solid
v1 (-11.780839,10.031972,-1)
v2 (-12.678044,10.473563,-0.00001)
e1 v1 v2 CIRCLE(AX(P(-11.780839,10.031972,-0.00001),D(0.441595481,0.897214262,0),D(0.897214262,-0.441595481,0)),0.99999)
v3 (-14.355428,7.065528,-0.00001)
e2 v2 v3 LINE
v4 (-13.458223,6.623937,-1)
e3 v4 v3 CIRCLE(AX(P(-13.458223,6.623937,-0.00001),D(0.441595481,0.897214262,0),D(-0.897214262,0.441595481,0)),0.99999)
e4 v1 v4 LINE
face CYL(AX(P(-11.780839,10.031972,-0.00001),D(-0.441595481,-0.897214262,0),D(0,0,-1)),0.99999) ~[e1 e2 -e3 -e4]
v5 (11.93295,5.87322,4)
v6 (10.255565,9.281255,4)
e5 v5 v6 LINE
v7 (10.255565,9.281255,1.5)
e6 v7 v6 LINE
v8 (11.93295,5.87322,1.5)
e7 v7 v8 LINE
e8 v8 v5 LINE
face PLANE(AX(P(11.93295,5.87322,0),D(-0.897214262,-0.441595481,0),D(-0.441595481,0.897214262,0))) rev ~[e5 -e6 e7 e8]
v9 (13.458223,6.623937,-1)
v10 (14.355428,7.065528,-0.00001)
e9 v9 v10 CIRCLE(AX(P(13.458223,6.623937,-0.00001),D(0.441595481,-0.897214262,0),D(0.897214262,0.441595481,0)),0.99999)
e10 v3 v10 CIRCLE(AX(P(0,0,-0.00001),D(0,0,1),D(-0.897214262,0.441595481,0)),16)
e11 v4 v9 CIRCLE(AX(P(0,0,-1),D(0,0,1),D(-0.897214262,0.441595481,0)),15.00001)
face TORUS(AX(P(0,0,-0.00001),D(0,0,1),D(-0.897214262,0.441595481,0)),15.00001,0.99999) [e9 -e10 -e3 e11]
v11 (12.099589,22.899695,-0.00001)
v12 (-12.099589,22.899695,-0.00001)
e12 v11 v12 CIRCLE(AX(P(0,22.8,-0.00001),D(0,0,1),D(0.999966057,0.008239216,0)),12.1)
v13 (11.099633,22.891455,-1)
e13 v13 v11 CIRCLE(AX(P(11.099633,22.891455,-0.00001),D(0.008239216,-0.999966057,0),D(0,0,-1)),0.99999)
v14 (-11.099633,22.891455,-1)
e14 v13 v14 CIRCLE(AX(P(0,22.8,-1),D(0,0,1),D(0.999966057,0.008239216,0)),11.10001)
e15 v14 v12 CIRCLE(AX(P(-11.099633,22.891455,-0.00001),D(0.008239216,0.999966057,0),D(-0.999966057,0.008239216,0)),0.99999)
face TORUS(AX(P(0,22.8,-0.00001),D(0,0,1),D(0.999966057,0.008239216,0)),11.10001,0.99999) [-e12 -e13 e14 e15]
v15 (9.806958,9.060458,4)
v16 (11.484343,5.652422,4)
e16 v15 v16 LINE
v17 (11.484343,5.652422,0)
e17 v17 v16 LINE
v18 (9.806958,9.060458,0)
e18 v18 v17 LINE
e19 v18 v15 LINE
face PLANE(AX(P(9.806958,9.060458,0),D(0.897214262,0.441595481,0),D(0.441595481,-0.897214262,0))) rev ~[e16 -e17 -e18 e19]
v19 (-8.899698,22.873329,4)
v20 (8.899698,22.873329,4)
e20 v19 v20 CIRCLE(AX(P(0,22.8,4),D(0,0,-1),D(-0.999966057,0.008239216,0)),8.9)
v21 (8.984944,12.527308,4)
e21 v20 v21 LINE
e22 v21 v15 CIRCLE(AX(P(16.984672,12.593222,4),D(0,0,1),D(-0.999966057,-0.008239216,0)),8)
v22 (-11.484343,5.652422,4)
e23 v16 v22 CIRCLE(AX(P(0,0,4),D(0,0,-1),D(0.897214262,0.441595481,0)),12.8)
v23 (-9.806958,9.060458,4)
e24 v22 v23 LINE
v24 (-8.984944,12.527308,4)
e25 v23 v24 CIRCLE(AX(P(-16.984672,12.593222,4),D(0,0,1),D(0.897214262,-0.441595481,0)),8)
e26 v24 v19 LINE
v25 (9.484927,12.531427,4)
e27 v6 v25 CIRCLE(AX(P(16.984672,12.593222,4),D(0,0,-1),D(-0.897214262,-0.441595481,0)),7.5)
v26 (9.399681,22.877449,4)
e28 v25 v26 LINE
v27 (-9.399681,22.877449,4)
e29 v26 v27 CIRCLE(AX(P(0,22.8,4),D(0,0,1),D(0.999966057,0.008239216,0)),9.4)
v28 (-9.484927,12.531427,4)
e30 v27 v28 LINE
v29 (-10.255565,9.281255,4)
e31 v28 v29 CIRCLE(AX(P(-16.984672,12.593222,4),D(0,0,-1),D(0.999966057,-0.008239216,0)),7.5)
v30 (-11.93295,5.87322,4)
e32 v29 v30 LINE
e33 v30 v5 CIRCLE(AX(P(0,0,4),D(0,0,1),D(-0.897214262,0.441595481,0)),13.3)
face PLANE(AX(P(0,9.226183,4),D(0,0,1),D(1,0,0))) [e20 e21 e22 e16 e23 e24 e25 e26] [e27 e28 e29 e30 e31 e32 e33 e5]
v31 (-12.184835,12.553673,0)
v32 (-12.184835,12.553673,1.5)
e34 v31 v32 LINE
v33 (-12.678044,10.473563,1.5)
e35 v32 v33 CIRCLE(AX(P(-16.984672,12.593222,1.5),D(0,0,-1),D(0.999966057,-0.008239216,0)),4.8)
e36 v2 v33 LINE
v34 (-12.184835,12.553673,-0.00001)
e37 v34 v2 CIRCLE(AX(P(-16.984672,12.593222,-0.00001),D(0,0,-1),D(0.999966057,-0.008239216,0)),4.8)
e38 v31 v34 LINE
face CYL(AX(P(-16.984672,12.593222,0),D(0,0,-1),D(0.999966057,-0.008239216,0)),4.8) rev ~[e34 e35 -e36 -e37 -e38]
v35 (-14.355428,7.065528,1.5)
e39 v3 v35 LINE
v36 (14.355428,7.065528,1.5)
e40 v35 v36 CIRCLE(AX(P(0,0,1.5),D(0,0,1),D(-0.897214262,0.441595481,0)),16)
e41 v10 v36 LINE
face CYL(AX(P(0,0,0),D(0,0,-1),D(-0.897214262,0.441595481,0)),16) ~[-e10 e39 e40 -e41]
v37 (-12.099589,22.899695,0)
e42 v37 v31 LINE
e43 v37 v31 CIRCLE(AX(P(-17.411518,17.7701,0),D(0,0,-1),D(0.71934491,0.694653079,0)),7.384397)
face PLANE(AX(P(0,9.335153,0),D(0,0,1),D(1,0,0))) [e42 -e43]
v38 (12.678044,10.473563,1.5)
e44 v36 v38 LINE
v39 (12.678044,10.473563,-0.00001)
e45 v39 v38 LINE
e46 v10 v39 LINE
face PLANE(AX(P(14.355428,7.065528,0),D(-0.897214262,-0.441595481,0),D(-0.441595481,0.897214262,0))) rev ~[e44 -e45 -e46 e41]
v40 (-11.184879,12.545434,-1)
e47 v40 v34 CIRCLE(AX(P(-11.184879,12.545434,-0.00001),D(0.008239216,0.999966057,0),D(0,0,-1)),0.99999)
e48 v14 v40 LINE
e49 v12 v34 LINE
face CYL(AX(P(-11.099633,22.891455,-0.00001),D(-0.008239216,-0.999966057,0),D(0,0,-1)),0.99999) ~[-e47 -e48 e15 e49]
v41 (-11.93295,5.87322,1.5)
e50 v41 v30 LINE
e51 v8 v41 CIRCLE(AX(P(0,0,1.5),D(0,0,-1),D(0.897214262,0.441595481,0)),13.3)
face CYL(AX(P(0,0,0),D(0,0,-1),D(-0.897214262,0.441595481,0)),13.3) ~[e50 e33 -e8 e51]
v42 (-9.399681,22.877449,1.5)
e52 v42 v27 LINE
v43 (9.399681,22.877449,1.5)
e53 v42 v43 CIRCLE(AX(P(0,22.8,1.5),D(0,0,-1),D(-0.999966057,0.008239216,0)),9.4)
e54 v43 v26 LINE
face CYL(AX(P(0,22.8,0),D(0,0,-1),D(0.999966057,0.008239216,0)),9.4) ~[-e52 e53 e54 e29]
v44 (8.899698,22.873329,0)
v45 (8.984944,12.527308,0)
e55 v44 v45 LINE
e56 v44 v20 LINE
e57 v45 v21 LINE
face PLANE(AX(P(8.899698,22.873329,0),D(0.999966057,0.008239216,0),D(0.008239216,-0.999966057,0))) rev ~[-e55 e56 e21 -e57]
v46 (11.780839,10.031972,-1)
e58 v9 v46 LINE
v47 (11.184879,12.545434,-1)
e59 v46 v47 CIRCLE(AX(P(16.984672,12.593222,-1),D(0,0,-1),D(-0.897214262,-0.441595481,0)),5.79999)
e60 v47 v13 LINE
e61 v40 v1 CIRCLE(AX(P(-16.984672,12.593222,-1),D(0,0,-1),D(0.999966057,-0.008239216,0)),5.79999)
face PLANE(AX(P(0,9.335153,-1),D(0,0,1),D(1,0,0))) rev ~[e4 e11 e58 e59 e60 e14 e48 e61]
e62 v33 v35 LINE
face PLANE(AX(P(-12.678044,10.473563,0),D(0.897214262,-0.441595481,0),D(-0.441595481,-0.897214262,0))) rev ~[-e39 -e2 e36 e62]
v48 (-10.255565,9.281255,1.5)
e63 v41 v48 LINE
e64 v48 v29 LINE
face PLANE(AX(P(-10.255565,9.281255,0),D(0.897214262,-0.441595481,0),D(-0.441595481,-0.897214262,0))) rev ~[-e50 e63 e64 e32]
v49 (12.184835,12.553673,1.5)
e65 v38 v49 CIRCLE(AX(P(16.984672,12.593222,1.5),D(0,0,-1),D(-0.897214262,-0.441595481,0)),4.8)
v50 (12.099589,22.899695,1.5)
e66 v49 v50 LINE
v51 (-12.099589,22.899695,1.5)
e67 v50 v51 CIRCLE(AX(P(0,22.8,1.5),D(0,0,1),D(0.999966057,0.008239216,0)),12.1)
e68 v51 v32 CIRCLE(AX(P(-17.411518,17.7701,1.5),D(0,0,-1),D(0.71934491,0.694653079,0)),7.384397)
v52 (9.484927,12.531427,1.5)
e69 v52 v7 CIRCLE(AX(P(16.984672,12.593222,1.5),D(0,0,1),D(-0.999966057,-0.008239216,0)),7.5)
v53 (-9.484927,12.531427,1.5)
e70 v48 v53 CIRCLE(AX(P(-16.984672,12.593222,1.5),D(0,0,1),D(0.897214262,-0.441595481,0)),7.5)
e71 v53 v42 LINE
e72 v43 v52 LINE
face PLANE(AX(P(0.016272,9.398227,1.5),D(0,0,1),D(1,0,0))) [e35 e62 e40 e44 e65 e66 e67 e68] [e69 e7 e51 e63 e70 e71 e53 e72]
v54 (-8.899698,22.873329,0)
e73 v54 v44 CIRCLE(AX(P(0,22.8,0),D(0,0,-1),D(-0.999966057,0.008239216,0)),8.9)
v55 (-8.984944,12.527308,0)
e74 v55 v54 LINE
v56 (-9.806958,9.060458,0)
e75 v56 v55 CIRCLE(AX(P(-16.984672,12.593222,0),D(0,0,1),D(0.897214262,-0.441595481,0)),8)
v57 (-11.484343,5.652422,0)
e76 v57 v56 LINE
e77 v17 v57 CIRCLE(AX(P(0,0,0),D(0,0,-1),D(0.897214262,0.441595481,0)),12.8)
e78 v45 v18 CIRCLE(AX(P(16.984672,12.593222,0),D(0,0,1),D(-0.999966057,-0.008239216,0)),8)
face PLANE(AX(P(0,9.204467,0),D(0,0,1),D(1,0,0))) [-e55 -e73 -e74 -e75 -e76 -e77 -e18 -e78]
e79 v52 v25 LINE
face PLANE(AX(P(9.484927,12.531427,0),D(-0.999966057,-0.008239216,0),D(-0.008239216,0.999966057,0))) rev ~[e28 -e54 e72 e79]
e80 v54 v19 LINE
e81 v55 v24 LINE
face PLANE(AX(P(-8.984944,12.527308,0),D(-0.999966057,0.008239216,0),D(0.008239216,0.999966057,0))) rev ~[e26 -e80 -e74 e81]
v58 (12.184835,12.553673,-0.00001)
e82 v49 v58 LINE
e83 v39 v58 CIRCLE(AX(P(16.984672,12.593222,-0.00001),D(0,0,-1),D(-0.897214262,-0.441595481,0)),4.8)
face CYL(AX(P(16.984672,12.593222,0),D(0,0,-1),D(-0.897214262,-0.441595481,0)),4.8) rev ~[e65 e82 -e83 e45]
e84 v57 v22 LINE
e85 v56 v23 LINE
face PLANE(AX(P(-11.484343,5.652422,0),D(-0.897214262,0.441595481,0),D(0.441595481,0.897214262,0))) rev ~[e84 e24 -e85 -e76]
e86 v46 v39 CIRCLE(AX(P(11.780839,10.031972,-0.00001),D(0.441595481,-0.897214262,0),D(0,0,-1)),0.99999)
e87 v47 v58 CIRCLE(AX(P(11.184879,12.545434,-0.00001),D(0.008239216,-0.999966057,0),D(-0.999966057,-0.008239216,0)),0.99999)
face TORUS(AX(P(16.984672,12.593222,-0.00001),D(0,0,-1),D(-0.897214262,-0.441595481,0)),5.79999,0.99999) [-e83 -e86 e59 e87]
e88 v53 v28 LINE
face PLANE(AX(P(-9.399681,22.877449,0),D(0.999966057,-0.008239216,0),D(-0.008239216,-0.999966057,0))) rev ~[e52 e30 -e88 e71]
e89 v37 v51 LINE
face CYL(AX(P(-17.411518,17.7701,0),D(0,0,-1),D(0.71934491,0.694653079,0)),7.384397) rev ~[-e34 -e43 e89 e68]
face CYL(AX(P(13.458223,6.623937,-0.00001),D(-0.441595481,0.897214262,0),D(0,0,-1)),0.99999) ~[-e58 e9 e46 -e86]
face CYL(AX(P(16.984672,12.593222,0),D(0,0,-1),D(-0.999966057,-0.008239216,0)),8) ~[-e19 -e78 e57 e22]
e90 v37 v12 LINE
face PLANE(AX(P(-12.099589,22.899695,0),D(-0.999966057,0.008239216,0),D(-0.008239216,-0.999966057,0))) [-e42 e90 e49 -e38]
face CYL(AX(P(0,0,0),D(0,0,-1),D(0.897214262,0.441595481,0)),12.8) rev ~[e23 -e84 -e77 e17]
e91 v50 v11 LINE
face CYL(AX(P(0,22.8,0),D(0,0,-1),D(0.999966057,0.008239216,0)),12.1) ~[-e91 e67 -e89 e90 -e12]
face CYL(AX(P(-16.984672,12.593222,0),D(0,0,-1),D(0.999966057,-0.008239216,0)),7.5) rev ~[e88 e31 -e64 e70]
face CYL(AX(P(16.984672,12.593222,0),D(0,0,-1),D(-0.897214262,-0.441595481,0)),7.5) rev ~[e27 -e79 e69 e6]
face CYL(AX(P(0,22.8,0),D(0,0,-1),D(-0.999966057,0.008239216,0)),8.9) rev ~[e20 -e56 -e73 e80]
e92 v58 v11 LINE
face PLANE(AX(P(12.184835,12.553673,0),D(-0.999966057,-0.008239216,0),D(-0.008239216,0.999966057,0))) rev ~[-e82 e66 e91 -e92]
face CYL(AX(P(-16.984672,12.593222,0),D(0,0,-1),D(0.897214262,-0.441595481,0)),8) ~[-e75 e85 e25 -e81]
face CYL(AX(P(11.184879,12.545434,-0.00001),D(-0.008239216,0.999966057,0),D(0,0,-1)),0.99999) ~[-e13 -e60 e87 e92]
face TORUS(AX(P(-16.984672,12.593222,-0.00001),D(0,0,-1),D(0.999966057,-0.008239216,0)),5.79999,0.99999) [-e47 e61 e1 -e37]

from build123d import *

# Parameters (mm, degrees)
F2_DEPTH = 4
F4_DEPTH = 1
F5_R     = 0.99999
F7_DEPTH = 1.5


# Not quite as in the source:
# - a fillet or chamfer is up to 0.001 mm smaller than in the source, because OpenCascade refuses the exact size


with BuildPart() as f2:
    # F1 (on face) → F2 (new body)
    with BuildSketch(Plane.XY):
        with BuildLine():
            ThreePointArc((-9.4849269336, 12.5314274341), (-9.6870039278, 10.8628934269), (-10.2555653995, 9.2812554476))
            Line((-10.2555653995, 9.2812554476), (-11.9329496797, 5.8732198956))
            ThreePointArc((-11.9329496797, 5.8732198956), (0, -13.3), (11.9329496797, 5.8732198956))
            Line((11.9329496797, 5.8732198956), (10.2555653995, 9.2812554476))
            ThreePointArc((10.2555653995, 9.2812554476), (9.6870039278, 10.8628934269), (9.4849269336, 12.5314274341))
            Line((9.4849269336, 12.5314274341), (9.3996809366, 22.8774486305))
            ThreePointArc((9.3996809366, 22.8774486305), (0, 32.2), (-9.3996809366, 22.8774486305))
            Line((-9.3996809366, 22.8774486305), (-9.4849269336, 12.5314274341))
        make_face()
        with BuildLine():
            ThreePointArc((-9.8069582687, 9.0604577072), (-9.2004926988, 10.7475382184), (-8.9849439051, 12.5273078261))
            Line((-8.9849439051, 12.5273078261), (-8.899697908, 22.8733290225))
            ThreePointArc((-8.899697908, 22.8733290225), (0, 31.7), (8.899697908, 22.8733290225))
            Line((8.899697908, 22.8733290225), (8.9849439051, 12.5273078261))
            ThreePointArc((8.9849439051, 12.5273078261), (9.2004926988, 10.7475382184), (9.8069582687, 9.0604577072))
            Line((9.8069582687, 9.0604577072), (11.4843425489, 5.6524221551))
            ThreePointArc((11.4843425489, 5.6524221551), (0, -12.8), (-11.4843425489, 5.6524221551))
            Line((-11.4843425489, 5.6524221551), (-9.8069582687, 9.0604577072))
        make_face(mode=Mode.SUBTRACT)
    extrude(amount=F2_DEPTH)

    # F3 (on face) + F0 (on Top) → F4 (join)
    with BuildSketch(Plane.XY):
        with BuildLine():
            ThreePointArc((12.6780439059, 10.473563246), (12.314164564, 11.4858115527), (12.1848352877, 12.5536733173))
            Line((12.1848352877, 12.5536733173), (12.0995892907, 22.8996945138))
            ThreePointArc((12.0995892907, 22.8996945138), (0, 34.9), (-12.0995892907, 22.8996945138))
            Line((-12.0995892907, 22.8996945138), (-12.1848352877, 12.5536733173))
            ThreePointArc((-12.1848352877, 12.5536733173), (-12.314164564, 11.4858115527), (-12.6780439059, 10.473563246))
            Line((-12.6780439059, 10.473563246), (-14.3554281861, 7.0655276939))
            ThreePointArc((-14.3554281861, 7.0655276939), (0, -16), (14.3554281861, 7.0655276939))
            Line((14.3554281861, 7.0655276939), (12.6780439059, 10.473563246))
        make_face()
        with BuildLine():
            ThreePointArc((-8.899697908, 22.8733290225), (0, 31.7), (8.899697908, 22.8733290225))
            Line((8.899697908, 22.8733290225), (8.9849439051, 12.5273078261))
            ThreePointArc((8.9849439051, 12.5273078261), (9.2004926988, 10.7475382184), (9.8069582687, 9.0604577072))
            Line((9.8069582687, 9.0604577072), (11.4843425489, 5.6524221551))
            ThreePointArc((11.4843425489, 5.6524221551), (0, -12.8), (-11.4843425489, 5.6524221551))
            Line((-11.4843425489, 5.6524221551), (-9.8069582687, 9.0604577072))
            ThreePointArc((-9.8069582687, 9.0604577072), (-9.2004926988, 10.7475382184), (-8.9849439051, 12.5273078261))
            Line((-8.9849439051, 12.5273078261), (-8.899697908, 22.8733290225))
        make_face(mode=Mode.SUBTRACT)
    with BuildSketch(Plane.XY):
        with BuildLine():
            Line((-9.8069582687, 9.0604577072), (-11.4843425489, 5.6524221551))
            ThreePointArc((-11.4843425489, 5.6524221551), (0, -12.8), (11.4843425489, 5.6524221551))
            Line((11.4843425489, 5.6524221551), (9.8069582687, 9.0604577072))
            ThreePointArc((9.8069582687, 9.0604577072), (9.2004926988, 10.7475382184), (8.9849439051, 12.5273078261))
            Line((8.9849439051, 12.5273078261), (8.899697908, 22.8733290225))
            ThreePointArc((8.899697908, 22.8733290225), (0, 31.7), (-8.899697908, 22.8733290225))
            Line((-8.899697908, 22.8733290225), (-8.9849439051, 12.5273078261))
            ThreePointArc((-8.9849439051, 12.5273078261), (-9.2004926988, 10.7475382184), (-9.8069582687, 9.0604577072))
        make_face()
    extrude(amount=-F4_DEPTH)

    # F5 (radius 1 in the source; OpenCascade refuses exactly that, so slightly less here)
    f5_edges = [f2.edges().sort_by_distance(p)[0] for p in [
        (0, -16, -1),
        (-13.516736, 8.769545, -1),
        (-12.314165, 11.485812, -1),
        (-12.142212, 17.726684, -1),
        (0, 34.9, -1),
        (12.142212, 17.726684, -1),
        (12.314165, 11.485812, -1),
        (13.516736, 8.769545, -1),
    ]]
    fillet(f5_edges, radius=F5_R)

    # F6 (on face) → F7 (join)
    with BuildSketch(Plane.XY):
        with BuildLine():
            ThreePointArc((-12.1848352877, 12.5536733173), (-12.314164564, 11.4858115527), (-12.6780439059, 10.473563246))
            Line((-12.6780439059, 10.473563246), (-14.3554281861, 7.0655276939))
            ThreePointArc((-14.3554281861, 7.0655276939), (0, -16), (14.3554281861, 7.0655276939))
            Line((14.3554281861, 7.0655276939), (12.6780439059, 10.473563246))
            ThreePointArc((12.6780439059, 10.473563246), (12.314164564, 11.4858115527), (12.1848352877, 12.5536733173))
            Line((12.1848352877, 12.5536733173), (12.0995892907, 22.8996945138))
            ThreePointArc((12.0995892907, 22.8996945138), (0, 34.9), (-12.0995892907, 22.8996945138))
            ThreePointArc((-12.0995892907, 22.8996945138), (-10.0273713078, 17.7092586924), (-12.1848352877, 12.5536733173))
        make_face()
        with BuildLine():
            ThreePointArc((-10.2555653995, 9.2812554476), (-9.6870039278, 10.8628934269), (-9.4849269336, 12.5314274341))
            Line((-9.4849269336, 12.5314274341), (-9.3996809366, 22.8774486305))
            ThreePointArc((-9.3996809366, 22.8774486305), (0, 32.2), (9.3996809366, 22.8774486305))
            Line((9.3996809366, 22.8774486305), (9.4849269336, 12.5314274341))
            ThreePointArc((9.4849269336, 12.5314274341), (9.6870039278, 10.8628934269), (10.2555653995, 9.2812554476))
            Line((10.2555653995, 9.2812554476), (11.9329496797, 5.8732198956))
            ThreePointArc((11.9329496797, 5.8732198956), (0, -13.3), (-11.9329496797, 5.8732198956))
            Line((-11.9329496797, 5.8732198956), (-10.2555653995, 9.2812554476))
        make_face(mode=Mode.SUBTRACT)
    extrude(amount=F7_DEPTH)


solid = f2.part
